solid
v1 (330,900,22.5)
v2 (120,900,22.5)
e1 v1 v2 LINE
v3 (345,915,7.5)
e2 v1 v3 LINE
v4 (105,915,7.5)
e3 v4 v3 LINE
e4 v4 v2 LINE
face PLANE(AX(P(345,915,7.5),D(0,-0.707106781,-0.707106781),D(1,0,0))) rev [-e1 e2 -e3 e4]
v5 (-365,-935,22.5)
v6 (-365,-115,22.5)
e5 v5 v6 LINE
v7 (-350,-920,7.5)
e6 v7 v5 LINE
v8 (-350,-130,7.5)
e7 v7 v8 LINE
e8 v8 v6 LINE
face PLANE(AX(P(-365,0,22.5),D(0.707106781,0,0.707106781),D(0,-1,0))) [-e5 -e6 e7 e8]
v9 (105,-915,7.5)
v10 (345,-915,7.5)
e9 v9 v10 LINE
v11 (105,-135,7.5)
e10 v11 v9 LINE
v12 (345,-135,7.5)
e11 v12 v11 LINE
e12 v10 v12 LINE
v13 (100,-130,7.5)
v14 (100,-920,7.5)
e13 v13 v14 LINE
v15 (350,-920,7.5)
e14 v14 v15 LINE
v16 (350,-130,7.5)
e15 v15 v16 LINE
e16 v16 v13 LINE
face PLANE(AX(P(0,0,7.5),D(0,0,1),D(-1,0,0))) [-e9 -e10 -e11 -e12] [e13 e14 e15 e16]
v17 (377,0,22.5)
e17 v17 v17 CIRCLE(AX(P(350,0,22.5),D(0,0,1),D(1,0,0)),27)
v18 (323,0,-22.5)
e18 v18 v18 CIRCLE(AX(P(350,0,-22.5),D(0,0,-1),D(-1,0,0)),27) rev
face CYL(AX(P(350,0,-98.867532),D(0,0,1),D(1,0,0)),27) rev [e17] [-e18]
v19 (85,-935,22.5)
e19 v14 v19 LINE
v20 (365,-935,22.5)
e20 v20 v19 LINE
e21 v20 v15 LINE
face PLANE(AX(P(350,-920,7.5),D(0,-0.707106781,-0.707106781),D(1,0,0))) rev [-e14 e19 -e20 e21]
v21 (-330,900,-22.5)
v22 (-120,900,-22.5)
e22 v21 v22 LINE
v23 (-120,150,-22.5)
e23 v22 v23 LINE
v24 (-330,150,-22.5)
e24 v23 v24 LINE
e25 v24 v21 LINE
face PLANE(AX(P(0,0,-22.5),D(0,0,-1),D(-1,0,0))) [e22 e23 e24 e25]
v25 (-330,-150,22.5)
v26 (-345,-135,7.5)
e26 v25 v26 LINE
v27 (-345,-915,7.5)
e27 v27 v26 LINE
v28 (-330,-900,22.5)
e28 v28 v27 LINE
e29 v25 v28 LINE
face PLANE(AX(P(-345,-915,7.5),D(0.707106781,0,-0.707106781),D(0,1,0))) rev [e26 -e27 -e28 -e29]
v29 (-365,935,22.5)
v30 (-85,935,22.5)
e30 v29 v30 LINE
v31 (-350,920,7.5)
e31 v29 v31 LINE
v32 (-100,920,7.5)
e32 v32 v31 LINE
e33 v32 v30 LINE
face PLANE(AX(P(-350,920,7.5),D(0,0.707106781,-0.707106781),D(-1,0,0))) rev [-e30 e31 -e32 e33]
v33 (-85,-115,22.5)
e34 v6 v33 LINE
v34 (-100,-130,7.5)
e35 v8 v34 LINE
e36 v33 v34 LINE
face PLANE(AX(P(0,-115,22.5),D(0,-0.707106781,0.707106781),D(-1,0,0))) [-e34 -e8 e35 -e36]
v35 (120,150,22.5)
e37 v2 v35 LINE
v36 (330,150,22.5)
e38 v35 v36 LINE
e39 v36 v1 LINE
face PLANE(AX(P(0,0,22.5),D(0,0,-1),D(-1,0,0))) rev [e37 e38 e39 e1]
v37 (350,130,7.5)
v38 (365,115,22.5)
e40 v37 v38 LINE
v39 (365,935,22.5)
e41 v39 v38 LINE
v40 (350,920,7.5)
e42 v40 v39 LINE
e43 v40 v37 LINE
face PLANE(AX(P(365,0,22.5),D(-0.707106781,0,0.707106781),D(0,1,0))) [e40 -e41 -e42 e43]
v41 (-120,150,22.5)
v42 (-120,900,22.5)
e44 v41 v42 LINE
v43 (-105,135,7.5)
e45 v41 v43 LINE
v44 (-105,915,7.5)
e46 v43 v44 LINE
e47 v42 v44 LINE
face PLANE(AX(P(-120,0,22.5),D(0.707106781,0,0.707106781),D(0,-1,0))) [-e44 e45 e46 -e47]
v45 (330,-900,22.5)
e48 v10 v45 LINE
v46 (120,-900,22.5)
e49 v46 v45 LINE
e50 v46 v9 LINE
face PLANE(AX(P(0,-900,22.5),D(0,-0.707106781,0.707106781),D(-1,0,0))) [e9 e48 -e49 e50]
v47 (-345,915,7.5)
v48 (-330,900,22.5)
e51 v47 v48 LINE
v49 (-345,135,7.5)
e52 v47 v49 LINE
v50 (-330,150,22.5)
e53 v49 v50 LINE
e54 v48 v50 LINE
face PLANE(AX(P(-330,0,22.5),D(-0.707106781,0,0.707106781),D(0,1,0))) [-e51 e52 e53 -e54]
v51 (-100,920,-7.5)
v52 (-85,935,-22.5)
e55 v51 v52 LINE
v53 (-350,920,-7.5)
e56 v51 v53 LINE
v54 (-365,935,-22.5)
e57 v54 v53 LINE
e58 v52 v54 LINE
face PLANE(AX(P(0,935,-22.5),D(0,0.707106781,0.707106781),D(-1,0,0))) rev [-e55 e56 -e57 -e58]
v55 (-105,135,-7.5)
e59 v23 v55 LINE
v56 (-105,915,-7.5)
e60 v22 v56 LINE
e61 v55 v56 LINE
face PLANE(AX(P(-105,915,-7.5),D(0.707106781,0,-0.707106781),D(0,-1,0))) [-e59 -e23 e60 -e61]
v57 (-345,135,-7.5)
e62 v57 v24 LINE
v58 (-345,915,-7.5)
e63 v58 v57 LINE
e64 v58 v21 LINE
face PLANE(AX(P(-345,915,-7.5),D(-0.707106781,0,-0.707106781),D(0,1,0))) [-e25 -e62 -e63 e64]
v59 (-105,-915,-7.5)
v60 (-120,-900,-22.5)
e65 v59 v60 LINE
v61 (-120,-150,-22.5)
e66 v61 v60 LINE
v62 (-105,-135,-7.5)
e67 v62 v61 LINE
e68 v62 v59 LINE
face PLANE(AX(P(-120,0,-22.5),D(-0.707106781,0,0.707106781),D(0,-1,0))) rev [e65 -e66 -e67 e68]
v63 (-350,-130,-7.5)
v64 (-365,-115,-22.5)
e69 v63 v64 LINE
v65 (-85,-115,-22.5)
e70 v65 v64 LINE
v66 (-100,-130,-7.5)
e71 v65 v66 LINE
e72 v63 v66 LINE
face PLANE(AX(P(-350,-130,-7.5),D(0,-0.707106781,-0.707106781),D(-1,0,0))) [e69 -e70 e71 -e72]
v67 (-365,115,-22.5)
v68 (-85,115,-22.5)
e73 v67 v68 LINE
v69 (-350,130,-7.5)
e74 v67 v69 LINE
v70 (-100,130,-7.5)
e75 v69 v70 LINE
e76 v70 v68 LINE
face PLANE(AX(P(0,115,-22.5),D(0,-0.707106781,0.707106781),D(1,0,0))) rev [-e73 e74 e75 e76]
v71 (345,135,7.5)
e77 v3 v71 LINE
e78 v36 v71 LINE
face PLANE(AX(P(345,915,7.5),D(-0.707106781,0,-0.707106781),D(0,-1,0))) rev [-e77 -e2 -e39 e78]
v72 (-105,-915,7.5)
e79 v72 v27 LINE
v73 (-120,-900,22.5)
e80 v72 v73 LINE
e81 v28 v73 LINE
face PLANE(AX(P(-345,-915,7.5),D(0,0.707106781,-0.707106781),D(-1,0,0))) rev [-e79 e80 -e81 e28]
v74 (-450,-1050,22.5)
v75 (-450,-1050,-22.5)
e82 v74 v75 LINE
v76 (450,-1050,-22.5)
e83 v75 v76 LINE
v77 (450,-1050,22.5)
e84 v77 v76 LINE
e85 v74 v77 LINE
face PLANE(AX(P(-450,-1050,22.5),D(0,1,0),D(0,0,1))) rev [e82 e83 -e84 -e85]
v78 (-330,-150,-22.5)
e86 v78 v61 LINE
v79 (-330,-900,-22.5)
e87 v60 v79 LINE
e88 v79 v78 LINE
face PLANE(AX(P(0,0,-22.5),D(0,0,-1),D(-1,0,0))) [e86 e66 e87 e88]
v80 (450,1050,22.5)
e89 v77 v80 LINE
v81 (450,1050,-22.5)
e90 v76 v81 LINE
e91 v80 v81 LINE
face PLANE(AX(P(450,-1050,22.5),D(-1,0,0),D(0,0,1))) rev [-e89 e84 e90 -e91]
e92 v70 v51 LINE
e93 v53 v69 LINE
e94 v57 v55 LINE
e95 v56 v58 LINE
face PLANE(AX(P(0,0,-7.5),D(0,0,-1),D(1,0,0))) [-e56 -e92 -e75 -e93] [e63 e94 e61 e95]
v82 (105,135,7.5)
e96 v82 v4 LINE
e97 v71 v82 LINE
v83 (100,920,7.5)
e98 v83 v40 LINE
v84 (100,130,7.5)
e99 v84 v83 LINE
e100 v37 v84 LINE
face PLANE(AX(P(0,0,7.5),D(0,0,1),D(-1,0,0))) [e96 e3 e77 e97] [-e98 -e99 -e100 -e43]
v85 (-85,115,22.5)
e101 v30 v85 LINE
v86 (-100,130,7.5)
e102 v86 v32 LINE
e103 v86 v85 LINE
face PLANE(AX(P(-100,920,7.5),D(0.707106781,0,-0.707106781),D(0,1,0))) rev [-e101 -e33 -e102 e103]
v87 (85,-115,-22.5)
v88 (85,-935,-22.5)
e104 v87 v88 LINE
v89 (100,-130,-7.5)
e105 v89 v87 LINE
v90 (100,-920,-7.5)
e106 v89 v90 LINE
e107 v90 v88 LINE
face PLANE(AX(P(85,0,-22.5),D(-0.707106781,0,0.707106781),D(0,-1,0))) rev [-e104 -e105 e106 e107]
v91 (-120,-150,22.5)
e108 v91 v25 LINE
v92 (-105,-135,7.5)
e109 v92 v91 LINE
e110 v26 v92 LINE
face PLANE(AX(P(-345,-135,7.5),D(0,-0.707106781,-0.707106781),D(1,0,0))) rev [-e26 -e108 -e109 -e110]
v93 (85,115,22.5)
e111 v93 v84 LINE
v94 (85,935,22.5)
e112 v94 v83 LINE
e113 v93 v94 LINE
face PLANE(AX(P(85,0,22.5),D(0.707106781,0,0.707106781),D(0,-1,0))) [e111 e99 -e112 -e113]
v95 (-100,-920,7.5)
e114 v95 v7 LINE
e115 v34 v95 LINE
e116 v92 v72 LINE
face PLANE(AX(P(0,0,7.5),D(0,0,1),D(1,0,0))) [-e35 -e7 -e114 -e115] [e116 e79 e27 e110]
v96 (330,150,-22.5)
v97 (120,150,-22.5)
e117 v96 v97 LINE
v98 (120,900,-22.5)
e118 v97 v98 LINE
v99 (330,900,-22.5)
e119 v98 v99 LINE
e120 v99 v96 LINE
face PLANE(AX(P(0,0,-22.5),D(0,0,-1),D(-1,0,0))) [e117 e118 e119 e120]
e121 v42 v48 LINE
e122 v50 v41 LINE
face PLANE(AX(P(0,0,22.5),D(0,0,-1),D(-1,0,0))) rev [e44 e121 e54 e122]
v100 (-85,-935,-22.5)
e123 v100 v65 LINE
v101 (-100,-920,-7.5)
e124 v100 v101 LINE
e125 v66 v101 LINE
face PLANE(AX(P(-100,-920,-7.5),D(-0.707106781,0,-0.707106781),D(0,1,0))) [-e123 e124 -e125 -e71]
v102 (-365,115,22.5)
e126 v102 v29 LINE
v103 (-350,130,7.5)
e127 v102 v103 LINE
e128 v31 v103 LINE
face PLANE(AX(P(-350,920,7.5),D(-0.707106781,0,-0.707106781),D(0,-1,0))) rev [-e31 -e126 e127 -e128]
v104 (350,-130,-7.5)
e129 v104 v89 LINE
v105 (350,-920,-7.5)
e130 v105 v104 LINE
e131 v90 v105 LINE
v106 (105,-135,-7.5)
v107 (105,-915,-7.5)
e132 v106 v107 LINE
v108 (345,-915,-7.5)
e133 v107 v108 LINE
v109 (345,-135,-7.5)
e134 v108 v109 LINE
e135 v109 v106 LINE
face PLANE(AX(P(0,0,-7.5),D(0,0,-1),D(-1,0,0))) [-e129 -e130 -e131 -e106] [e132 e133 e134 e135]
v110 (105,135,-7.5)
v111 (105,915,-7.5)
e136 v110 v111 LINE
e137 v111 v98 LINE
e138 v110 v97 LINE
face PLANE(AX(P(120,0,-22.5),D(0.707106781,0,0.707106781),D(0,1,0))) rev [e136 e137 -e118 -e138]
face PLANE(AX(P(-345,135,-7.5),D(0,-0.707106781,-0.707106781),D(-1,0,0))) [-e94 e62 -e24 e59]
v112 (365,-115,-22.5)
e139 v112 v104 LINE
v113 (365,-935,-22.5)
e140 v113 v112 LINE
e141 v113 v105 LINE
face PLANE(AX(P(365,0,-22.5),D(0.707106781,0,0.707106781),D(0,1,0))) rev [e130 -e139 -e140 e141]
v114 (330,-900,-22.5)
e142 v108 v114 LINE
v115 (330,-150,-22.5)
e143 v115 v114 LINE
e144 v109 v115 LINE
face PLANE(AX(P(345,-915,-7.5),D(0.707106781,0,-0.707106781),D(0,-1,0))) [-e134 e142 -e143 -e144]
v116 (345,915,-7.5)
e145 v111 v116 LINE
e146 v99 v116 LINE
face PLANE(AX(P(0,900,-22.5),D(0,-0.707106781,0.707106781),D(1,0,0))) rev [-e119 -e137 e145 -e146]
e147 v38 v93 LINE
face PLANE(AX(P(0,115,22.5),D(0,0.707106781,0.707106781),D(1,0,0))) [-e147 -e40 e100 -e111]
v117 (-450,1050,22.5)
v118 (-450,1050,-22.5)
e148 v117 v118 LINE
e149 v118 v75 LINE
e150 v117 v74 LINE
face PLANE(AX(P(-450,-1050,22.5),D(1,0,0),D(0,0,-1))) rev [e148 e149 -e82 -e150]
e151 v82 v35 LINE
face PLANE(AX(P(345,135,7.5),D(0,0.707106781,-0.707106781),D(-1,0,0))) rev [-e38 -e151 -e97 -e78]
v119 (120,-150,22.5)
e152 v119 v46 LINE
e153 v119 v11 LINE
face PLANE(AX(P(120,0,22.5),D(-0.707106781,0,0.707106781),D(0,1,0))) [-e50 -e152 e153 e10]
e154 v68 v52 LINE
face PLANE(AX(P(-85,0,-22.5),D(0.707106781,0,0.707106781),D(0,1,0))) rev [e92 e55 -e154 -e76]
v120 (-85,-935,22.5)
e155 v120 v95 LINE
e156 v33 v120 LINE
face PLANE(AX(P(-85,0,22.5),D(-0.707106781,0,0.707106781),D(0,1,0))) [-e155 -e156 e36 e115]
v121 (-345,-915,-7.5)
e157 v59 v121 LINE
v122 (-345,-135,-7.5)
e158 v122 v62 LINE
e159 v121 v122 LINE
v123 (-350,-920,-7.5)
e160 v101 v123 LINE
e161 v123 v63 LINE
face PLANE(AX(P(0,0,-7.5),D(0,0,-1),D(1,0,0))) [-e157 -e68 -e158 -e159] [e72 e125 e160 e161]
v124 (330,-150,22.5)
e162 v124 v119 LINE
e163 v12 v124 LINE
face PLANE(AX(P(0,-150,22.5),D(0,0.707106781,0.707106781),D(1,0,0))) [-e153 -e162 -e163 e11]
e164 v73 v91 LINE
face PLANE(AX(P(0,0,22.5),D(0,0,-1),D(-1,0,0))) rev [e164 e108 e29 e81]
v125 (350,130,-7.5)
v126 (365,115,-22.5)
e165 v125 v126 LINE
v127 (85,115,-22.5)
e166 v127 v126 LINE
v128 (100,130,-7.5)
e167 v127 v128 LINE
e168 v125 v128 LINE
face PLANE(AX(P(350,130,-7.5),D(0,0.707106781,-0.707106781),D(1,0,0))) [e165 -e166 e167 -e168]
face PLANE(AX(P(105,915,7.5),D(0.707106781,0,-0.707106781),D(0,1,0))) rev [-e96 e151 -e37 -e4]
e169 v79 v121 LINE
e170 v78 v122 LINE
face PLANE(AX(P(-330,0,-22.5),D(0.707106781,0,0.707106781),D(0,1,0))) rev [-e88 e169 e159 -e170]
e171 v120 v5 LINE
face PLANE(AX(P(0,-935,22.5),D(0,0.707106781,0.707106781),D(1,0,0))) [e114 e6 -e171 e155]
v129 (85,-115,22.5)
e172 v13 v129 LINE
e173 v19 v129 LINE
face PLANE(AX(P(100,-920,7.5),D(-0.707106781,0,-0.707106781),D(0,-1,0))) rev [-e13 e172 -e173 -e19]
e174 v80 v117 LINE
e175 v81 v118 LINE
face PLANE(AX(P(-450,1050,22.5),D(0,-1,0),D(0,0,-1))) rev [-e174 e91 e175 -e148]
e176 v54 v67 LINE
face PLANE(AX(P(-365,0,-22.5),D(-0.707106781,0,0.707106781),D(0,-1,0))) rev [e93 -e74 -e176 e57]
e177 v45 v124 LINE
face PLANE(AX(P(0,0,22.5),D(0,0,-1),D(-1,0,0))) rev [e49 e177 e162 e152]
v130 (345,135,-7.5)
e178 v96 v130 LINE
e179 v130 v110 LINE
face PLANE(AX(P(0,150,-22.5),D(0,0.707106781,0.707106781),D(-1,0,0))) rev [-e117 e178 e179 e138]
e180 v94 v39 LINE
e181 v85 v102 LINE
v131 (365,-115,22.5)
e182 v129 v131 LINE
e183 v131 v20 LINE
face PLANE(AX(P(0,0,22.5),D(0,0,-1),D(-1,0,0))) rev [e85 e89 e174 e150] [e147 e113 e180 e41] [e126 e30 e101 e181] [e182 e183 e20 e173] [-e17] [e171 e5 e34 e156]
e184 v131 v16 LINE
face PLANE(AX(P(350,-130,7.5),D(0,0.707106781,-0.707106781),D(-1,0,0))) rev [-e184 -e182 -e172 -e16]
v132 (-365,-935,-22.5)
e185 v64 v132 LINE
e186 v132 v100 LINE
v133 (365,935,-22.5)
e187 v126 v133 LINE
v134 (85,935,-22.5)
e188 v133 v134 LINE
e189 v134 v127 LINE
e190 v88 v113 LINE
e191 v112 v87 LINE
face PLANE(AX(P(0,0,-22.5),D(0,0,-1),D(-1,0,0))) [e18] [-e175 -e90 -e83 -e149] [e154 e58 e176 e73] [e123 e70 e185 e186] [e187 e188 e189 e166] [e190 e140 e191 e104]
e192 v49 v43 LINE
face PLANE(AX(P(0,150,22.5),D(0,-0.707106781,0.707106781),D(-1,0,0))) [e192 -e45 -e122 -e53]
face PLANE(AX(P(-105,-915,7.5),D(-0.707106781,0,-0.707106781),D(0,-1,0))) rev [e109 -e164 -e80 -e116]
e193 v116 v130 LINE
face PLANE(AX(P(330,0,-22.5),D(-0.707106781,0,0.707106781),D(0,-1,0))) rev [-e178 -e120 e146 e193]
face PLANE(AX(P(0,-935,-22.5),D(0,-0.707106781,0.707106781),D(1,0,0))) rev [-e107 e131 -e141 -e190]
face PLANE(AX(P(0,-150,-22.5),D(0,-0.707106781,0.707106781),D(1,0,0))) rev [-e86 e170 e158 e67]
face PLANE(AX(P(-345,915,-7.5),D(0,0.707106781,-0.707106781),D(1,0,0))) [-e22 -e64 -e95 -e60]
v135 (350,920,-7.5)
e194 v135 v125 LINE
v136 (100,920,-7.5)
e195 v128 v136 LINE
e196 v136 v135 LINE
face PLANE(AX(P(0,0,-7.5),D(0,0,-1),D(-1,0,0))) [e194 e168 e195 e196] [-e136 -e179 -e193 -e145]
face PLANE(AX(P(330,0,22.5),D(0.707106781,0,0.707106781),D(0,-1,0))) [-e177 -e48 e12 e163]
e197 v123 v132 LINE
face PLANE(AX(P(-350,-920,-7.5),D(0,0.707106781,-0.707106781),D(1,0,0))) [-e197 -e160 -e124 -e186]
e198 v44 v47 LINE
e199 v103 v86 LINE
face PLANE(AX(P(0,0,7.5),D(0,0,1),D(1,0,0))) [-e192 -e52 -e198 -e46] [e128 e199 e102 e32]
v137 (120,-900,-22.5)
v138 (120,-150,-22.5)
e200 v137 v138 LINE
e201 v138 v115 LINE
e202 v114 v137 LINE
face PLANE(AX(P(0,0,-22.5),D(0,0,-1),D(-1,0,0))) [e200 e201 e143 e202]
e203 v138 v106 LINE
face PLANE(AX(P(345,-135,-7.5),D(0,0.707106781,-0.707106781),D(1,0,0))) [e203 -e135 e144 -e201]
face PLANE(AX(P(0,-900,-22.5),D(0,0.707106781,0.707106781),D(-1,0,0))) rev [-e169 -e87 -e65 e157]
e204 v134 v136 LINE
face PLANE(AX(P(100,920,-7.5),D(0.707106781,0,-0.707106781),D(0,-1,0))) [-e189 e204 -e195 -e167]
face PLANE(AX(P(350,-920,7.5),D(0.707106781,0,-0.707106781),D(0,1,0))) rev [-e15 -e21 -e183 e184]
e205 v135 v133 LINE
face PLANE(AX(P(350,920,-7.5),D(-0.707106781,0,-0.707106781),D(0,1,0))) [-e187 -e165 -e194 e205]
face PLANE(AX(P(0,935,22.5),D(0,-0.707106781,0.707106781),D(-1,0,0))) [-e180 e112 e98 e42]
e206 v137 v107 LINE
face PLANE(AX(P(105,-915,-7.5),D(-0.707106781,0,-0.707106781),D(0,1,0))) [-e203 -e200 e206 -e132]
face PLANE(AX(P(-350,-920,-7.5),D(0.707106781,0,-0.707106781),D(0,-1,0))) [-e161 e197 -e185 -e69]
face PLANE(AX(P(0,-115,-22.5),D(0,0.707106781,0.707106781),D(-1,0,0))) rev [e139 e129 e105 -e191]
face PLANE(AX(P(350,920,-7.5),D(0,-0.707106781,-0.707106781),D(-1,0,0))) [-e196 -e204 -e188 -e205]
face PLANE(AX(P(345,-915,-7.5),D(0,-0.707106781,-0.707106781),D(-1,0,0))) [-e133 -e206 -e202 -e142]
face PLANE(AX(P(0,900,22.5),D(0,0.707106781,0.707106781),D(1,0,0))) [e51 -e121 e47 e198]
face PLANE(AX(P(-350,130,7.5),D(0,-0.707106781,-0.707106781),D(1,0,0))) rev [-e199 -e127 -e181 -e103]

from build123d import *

# Parameters (mm, degrees)
SKETCH1_W                  = 900
SKETCH1_H                  = 2100
BOSS_EXTRUDE1_DEPTH        = 22.5
SKETCH2_W                  = 250
SKETCH2_H                  = 790
SKETCH2_W_2                = 240
SKETCH2_H_2                = 780
CUT_EXTRUDE1_DEPTH         = 15
CHAMFER1_SIZE              = 15
CHAMFER1_OF_MIRROR1_SIZE   = 15
MIRROR2_OUTLINE_W          = 250
MIRROR2_OUTLINE_H          = 790
MIRROR2_OUTLINE_W_2        = 240
MIRROR2_OUTLINE_H_2        = 780
MIRROR2_DEPTH              = 15
MIRROR2_DRAFT              = -45
MIRROR2_2_OUTLINE_W        = 250
MIRROR2_2_OUTLINE_H        = 790
MIRROR2_2_OUTLINE_W_2      = 240
MIRROR2_2_OUTLINE_H_2      = 780
MIRROR2_2_DEPTH            = 15
MIRROR2_2_DRAFT            = -45
CHAMFER2_SIZE              = 15
MIRROR10_COPY_1_SKETCH_W   = 250
MIRROR10_COPY_1_SKETCH_H   = 790
MIRROR10_COPY_1_SKETCH_W_2 = 240
MIRROR10_COPY_1_SKETCH_H_2 = 780
MIRROR10_COPY_1_DEPTH      = 15
MIRROR10_COPY_2_SKETCH_W   = 250
MIRROR10_COPY_2_SKETCH_H   = 790
MIRROR10_COPY_2_SKETCH_W_2 = 240
MIRROR10_COPY_2_SKETCH_H_2 = 780
MIRROR10_COPY_2_DEPTH      = 15
CHAMFER2_OF_MIRROR10_SIZE  = 15
MIRROR11_OUTLINE_W         = 250
MIRROR11_OUTLINE_H         = 790
MIRROR11_OUTLINE_W_2       = 240
MIRROR11_OUTLINE_H_2       = 780
MIRROR11_DEPTH             = 15
MIRROR11_DRAFT             = 45
MIRROR11_2_OUTLINE_W       = 250
MIRROR11_2_OUTLINE_H       = 790
MIRROR11_2_OUTLINE_W_2     = 240
MIRROR11_2_OUTLINE_H_2     = 780
MIRROR11_2_DEPTH           = 15
MIRROR11_2_DRAFT           = 45
SKETCH4_R                  = 27
CUT_EXTRUDE2_DEPTH         = 45


# Read off the part's stored shape, not the designer's step: Mirror2, Mirror11
with BuildPart() as part:
    # Sketch1 → Boss-Extrude1 (new, symmetric)
    with BuildSketch(Plane.XY):
        Rectangle(SKETCH1_W, SKETCH1_H)
    extrude(amount=BOSS_EXTRUDE1_DEPTH, both=True)

    # Sketch2 → Cut-Extrude1 (cut)
    with BuildSketch(Plane.XY.offset(22.5)):
        with Locations((-225, 525)):
            Rectangle(SKETCH2_W, SKETCH2_H)
        with Locations((-225, 525)):
            Rectangle(SKETCH2_W_2, SKETCH2_H_2, mode=Mode.SUBTRACT)
    cut_extrude1 = extrude(amount=-CUT_EXTRUDE1_DEPTH, mode=Mode.SUBTRACT)

    # Chamfer1
    chamfer1_edges = [part.edges().sort_by_distance(p)[0] for p in [
        (-225, 915, 22.5),
        (-105, 525, 22.5),
        (-345, 525, 22.5),
        (-225, 135, 22.5),
        (-225, 920, 22.5),
        (-100, 525, 22.5),
        (-225, 130, 22.5),
        (-350, 525, 22.5),
    ]]
    chamfer(chamfer1_edges, length=CHAMFER1_SIZE - 0.0001)  # a hair under: the kernel refuses the full size

    # Mirror1: Cut-Extrude1 across plane
    add(cut_extrude1.mirror(Plane(origin=(0, 0, 0), x_dir=(0, 0, 1), z_dir=(1, 0, 0))), mode=Mode.SUBTRACT)

    # Chamfer1 of Mirror1
    chamfer1_of_mirror1_edges = [part.edges().sort_by_distance(p)[0] for p in [
        (225, 915, 22.5),
        (105, 525, 22.5),
        (345, 525, 22.5),
        (225, 135, 22.5),
        (225, 920, 22.5),
        (100, 525, 22.5),
        (225, 130, 22.5),
        (350, 525, 22.5),
    ]]
    chamfer(chamfer1_of_mirror1_edges, length=CHAMFER1_OF_MIRROR1_SIZE - 0.0001)  # a hair under: the kernel refuses the full size


with BuildPart() as mirror2_tool:
    # Mirror2 outline → Mirror2 (with draft: the straight prism first)
    with BuildSketch(Plane.XY.offset(7.5)):
        with Locations((-225, -525)):
            Rectangle(MIRROR2_OUTLINE_W, MIRROR2_OUTLINE_H)
        with Locations((-225, -525)):
            Rectangle(MIRROR2_OUTLINE_W_2, MIRROR2_OUTLINE_H_2, mode=Mode.SUBTRACT)
    extrude(amount=MIRROR2_DEPTH)
    # Mirror2: the draft: its side faces are tilted about the plane it starts from
    mirror2_sides = [mirror2_tool.faces().sort_by_distance(p)[0] for p in [
        (-350, -525, 15),
        (-225, -920, 15),
        (-100, -525, 15),
        (-225, -130, 15),
        (-225, -915, 15),
        (-345, -525, 15),
        (-225, -135, 15),
        (-105, -525, 15),
    ]]
    draft(mirror2_sides, Plane.XY.offset(7.5), MIRROR2_DRAFT)


with BuildPart() as part_1:
    add(part.part)

    # Mirror2: cut by mirror2_tool
    add(mirror2_tool.part, mode=Mode.SUBTRACT)


with BuildPart() as mirror2_2_tool:
    # Mirror2 2 outline → Mirror2 2 (with draft: the straight prism first)
    with BuildSketch(Plane.XY.offset(7.5)):
        with Locations((225, -525)):
            Rectangle(MIRROR2_2_OUTLINE_W, MIRROR2_2_OUTLINE_H)
        with Locations((225, -525)):
            Rectangle(MIRROR2_2_OUTLINE_W_2, MIRROR2_2_OUTLINE_H_2, mode=Mode.SUBTRACT)
    extrude(amount=MIRROR2_2_DEPTH)
    # Mirror2 2: the draft: its side faces are tilted about the plane it starts from
    mirror2_2_sides = [mirror2_2_tool.faces().sort_by_distance(p)[0] for p in [
        (350, -525, 15),
        (225, -130, 15),
        (100, -525, 15),
        (225, -920, 15),
        (105, -525, 15),
        (225, -135, 15),
        (345, -525, 15),
        (225, -915, 15),
    ]]
    draft(mirror2_2_sides, Plane.XY.offset(7.5), MIRROR2_2_DRAFT)


with BuildPart() as part_2:
    add(part_1.part)

    # Mirror2 2: cut by mirror2_2_tool
    add(mirror2_2_tool.part, mode=Mode.SUBTRACT)

    # Mirror5: Cut-Extrude1 across plane
    add(cut_extrude1.mirror(Plane.XY), mode=Mode.SUBTRACT)

    # Chamfer2
    chamfer2_edges = [part_2.edges().sort_by_distance(p)[0] for p in [
        (-225, 130, -22.5),
        (-350, 525, -22.5),
        (-100, 525, -22.5),
        (-225, 920, -22.5),
        (-225, 135, -22.5),
        (-345, 525, -22.5),
        (-105, 525, -22.5),
        (-225, 915, -22.5),
    ]]
    chamfer(chamfer2_edges, length=CHAMFER2_SIZE - 0.0001)  # a hair under: the kernel refuses the full size

    # Mirror10 copy 1 sketch → Mirror10 copy 1 (cut)
    with BuildSketch(Plane(origin=(0, 0, -22.5), x_dir=(-1, 0, 0), z_dir=(0, 0, -1))):
        with Locations((-225, 525)):
            Rectangle(MIRROR10_COPY_1_SKETCH_W, MIRROR10_COPY_1_SKETCH_H)
        with Locations((-225, 525)):
            Rectangle(MIRROR10_COPY_1_SKETCH_W_2, MIRROR10_COPY_1_SKETCH_H_2, mode=Mode.SUBTRACT)
    extrude(amount=-MIRROR10_COPY_1_DEPTH, mode=Mode.SUBTRACT)

    # Mirror10 copy 2 sketch → Mirror10 copy 2 (cut)
    with BuildSketch(Plane(origin=(0, 0, 22.5), x_dir=(-1, 0, 0), z_dir=(0, 0, 1))):
        with Locations((-225, -525)):
            Rectangle(MIRROR10_COPY_2_SKETCH_W, MIRROR10_COPY_2_SKETCH_H)
        with Locations((-225, -525)):
            Rectangle(MIRROR10_COPY_2_SKETCH_W_2, MIRROR10_COPY_2_SKETCH_H_2, mode=Mode.SUBTRACT)
    extrude(amount=-MIRROR10_COPY_2_DEPTH, mode=Mode.SUBTRACT)

    # Chamfer2 of Mirror10
    chamfer2_of_mirror10_edges = [part_2.edges().sort_by_distance(p)[0] for p in [
        (225, 130, -22.5),
        (350, 525, -22.5),
        (100, 525, -22.5),
        (225, 920, -22.5),
        (225, 135, -22.5),
        (345, 525, -22.5),
        (105, 525, -22.5),
        (225, 915, -22.5),
    ]]
    chamfer(chamfer2_of_mirror10_edges, length=CHAMFER2_OF_MIRROR10_SIZE - 0.0001)  # a hair under: the kernel refuses the full size


with BuildPart() as mirror11_tool:
    # Mirror11 outline → Mirror11 (with draft: the straight prism first)
    with BuildSketch(Plane.XY.offset(-7.5)):
        with Locations((-225, -525)):
            Rectangle(MIRROR11_OUTLINE_W, MIRROR11_OUTLINE_H)
        with Locations((-225, -525)):
            Rectangle(MIRROR11_OUTLINE_W_2, MIRROR11_OUTLINE_H_2, mode=Mode.SUBTRACT)
    extrude(amount=-MIRROR11_DEPTH)
    # Mirror11: the draft: its side faces are tilted about the plane it starts from
    mirror11_sides = [mirror11_tool.faces().sort_by_distance(p)[0] for p in [
        (-225, -920, -15),
        (-100, -525, -15),
        (-225, -130, -15),
        (-350, -525, -15),
        (-225, -915, -15),
        (-345, -525, -15),
        (-225, -135, -15),
        (-105, -525, -15),
    ]]
    draft(mirror11_sides, Plane.XY.offset(-7.5), MIRROR11_DRAFT)


with BuildPart() as part_3:
    add(part_2.part)

    # Mirror11: cut by mirror11_tool
    add(mirror11_tool.part, mode=Mode.SUBTRACT)


with BuildPart() as mirror11_2_tool:
    # Mirror11 2 outline → Mirror11 2 (with draft: the straight prism first)
    with BuildSketch(Plane.XY.offset(-7.5)):
        with Locations((225, -525)):
            Rectangle(MIRROR11_2_OUTLINE_W, MIRROR11_2_OUTLINE_H)
        with Locations((225, -525)):
            Rectangle(MIRROR11_2_OUTLINE_W_2, MIRROR11_2_OUTLINE_H_2, mode=Mode.SUBTRACT)
    extrude(amount=-MIRROR11_2_DEPTH)
    # Mirror11 2: the draft: its side faces are tilted about the plane it starts from
    mirror11_2_sides = [mirror11_2_tool.faces().sort_by_distance(p)[0] for p in [
        (225, -130, -15),
        (100, -525, -15),
        (225, -920, -15),
        (350, -525, -15),
        (105, -525, -15),
        (225, -135, -15),
        (345, -525, -15),
        (225, -915, -15),
    ]]
    draft(mirror11_2_sides, Plane.XY.offset(-7.5), MIRROR11_2_DRAFT)


with BuildPart() as part_4:
    add(part_3.part)

    # Mirror11 2: cut by mirror11_2_tool
    add(mirror11_2_tool.part, mode=Mode.SUBTRACT)

    # Sketch4 → Cut-Extrude2 (cut)
    with BuildSketch(Plane.XY.offset(22.5)):
        with Locations((350, 0)):
            Circle(SKETCH4_R)
    extrude(amount=-CUT_EXTRUDE2_DEPTH, mode=Mode.SUBTRACT)


solid = part_4.part
